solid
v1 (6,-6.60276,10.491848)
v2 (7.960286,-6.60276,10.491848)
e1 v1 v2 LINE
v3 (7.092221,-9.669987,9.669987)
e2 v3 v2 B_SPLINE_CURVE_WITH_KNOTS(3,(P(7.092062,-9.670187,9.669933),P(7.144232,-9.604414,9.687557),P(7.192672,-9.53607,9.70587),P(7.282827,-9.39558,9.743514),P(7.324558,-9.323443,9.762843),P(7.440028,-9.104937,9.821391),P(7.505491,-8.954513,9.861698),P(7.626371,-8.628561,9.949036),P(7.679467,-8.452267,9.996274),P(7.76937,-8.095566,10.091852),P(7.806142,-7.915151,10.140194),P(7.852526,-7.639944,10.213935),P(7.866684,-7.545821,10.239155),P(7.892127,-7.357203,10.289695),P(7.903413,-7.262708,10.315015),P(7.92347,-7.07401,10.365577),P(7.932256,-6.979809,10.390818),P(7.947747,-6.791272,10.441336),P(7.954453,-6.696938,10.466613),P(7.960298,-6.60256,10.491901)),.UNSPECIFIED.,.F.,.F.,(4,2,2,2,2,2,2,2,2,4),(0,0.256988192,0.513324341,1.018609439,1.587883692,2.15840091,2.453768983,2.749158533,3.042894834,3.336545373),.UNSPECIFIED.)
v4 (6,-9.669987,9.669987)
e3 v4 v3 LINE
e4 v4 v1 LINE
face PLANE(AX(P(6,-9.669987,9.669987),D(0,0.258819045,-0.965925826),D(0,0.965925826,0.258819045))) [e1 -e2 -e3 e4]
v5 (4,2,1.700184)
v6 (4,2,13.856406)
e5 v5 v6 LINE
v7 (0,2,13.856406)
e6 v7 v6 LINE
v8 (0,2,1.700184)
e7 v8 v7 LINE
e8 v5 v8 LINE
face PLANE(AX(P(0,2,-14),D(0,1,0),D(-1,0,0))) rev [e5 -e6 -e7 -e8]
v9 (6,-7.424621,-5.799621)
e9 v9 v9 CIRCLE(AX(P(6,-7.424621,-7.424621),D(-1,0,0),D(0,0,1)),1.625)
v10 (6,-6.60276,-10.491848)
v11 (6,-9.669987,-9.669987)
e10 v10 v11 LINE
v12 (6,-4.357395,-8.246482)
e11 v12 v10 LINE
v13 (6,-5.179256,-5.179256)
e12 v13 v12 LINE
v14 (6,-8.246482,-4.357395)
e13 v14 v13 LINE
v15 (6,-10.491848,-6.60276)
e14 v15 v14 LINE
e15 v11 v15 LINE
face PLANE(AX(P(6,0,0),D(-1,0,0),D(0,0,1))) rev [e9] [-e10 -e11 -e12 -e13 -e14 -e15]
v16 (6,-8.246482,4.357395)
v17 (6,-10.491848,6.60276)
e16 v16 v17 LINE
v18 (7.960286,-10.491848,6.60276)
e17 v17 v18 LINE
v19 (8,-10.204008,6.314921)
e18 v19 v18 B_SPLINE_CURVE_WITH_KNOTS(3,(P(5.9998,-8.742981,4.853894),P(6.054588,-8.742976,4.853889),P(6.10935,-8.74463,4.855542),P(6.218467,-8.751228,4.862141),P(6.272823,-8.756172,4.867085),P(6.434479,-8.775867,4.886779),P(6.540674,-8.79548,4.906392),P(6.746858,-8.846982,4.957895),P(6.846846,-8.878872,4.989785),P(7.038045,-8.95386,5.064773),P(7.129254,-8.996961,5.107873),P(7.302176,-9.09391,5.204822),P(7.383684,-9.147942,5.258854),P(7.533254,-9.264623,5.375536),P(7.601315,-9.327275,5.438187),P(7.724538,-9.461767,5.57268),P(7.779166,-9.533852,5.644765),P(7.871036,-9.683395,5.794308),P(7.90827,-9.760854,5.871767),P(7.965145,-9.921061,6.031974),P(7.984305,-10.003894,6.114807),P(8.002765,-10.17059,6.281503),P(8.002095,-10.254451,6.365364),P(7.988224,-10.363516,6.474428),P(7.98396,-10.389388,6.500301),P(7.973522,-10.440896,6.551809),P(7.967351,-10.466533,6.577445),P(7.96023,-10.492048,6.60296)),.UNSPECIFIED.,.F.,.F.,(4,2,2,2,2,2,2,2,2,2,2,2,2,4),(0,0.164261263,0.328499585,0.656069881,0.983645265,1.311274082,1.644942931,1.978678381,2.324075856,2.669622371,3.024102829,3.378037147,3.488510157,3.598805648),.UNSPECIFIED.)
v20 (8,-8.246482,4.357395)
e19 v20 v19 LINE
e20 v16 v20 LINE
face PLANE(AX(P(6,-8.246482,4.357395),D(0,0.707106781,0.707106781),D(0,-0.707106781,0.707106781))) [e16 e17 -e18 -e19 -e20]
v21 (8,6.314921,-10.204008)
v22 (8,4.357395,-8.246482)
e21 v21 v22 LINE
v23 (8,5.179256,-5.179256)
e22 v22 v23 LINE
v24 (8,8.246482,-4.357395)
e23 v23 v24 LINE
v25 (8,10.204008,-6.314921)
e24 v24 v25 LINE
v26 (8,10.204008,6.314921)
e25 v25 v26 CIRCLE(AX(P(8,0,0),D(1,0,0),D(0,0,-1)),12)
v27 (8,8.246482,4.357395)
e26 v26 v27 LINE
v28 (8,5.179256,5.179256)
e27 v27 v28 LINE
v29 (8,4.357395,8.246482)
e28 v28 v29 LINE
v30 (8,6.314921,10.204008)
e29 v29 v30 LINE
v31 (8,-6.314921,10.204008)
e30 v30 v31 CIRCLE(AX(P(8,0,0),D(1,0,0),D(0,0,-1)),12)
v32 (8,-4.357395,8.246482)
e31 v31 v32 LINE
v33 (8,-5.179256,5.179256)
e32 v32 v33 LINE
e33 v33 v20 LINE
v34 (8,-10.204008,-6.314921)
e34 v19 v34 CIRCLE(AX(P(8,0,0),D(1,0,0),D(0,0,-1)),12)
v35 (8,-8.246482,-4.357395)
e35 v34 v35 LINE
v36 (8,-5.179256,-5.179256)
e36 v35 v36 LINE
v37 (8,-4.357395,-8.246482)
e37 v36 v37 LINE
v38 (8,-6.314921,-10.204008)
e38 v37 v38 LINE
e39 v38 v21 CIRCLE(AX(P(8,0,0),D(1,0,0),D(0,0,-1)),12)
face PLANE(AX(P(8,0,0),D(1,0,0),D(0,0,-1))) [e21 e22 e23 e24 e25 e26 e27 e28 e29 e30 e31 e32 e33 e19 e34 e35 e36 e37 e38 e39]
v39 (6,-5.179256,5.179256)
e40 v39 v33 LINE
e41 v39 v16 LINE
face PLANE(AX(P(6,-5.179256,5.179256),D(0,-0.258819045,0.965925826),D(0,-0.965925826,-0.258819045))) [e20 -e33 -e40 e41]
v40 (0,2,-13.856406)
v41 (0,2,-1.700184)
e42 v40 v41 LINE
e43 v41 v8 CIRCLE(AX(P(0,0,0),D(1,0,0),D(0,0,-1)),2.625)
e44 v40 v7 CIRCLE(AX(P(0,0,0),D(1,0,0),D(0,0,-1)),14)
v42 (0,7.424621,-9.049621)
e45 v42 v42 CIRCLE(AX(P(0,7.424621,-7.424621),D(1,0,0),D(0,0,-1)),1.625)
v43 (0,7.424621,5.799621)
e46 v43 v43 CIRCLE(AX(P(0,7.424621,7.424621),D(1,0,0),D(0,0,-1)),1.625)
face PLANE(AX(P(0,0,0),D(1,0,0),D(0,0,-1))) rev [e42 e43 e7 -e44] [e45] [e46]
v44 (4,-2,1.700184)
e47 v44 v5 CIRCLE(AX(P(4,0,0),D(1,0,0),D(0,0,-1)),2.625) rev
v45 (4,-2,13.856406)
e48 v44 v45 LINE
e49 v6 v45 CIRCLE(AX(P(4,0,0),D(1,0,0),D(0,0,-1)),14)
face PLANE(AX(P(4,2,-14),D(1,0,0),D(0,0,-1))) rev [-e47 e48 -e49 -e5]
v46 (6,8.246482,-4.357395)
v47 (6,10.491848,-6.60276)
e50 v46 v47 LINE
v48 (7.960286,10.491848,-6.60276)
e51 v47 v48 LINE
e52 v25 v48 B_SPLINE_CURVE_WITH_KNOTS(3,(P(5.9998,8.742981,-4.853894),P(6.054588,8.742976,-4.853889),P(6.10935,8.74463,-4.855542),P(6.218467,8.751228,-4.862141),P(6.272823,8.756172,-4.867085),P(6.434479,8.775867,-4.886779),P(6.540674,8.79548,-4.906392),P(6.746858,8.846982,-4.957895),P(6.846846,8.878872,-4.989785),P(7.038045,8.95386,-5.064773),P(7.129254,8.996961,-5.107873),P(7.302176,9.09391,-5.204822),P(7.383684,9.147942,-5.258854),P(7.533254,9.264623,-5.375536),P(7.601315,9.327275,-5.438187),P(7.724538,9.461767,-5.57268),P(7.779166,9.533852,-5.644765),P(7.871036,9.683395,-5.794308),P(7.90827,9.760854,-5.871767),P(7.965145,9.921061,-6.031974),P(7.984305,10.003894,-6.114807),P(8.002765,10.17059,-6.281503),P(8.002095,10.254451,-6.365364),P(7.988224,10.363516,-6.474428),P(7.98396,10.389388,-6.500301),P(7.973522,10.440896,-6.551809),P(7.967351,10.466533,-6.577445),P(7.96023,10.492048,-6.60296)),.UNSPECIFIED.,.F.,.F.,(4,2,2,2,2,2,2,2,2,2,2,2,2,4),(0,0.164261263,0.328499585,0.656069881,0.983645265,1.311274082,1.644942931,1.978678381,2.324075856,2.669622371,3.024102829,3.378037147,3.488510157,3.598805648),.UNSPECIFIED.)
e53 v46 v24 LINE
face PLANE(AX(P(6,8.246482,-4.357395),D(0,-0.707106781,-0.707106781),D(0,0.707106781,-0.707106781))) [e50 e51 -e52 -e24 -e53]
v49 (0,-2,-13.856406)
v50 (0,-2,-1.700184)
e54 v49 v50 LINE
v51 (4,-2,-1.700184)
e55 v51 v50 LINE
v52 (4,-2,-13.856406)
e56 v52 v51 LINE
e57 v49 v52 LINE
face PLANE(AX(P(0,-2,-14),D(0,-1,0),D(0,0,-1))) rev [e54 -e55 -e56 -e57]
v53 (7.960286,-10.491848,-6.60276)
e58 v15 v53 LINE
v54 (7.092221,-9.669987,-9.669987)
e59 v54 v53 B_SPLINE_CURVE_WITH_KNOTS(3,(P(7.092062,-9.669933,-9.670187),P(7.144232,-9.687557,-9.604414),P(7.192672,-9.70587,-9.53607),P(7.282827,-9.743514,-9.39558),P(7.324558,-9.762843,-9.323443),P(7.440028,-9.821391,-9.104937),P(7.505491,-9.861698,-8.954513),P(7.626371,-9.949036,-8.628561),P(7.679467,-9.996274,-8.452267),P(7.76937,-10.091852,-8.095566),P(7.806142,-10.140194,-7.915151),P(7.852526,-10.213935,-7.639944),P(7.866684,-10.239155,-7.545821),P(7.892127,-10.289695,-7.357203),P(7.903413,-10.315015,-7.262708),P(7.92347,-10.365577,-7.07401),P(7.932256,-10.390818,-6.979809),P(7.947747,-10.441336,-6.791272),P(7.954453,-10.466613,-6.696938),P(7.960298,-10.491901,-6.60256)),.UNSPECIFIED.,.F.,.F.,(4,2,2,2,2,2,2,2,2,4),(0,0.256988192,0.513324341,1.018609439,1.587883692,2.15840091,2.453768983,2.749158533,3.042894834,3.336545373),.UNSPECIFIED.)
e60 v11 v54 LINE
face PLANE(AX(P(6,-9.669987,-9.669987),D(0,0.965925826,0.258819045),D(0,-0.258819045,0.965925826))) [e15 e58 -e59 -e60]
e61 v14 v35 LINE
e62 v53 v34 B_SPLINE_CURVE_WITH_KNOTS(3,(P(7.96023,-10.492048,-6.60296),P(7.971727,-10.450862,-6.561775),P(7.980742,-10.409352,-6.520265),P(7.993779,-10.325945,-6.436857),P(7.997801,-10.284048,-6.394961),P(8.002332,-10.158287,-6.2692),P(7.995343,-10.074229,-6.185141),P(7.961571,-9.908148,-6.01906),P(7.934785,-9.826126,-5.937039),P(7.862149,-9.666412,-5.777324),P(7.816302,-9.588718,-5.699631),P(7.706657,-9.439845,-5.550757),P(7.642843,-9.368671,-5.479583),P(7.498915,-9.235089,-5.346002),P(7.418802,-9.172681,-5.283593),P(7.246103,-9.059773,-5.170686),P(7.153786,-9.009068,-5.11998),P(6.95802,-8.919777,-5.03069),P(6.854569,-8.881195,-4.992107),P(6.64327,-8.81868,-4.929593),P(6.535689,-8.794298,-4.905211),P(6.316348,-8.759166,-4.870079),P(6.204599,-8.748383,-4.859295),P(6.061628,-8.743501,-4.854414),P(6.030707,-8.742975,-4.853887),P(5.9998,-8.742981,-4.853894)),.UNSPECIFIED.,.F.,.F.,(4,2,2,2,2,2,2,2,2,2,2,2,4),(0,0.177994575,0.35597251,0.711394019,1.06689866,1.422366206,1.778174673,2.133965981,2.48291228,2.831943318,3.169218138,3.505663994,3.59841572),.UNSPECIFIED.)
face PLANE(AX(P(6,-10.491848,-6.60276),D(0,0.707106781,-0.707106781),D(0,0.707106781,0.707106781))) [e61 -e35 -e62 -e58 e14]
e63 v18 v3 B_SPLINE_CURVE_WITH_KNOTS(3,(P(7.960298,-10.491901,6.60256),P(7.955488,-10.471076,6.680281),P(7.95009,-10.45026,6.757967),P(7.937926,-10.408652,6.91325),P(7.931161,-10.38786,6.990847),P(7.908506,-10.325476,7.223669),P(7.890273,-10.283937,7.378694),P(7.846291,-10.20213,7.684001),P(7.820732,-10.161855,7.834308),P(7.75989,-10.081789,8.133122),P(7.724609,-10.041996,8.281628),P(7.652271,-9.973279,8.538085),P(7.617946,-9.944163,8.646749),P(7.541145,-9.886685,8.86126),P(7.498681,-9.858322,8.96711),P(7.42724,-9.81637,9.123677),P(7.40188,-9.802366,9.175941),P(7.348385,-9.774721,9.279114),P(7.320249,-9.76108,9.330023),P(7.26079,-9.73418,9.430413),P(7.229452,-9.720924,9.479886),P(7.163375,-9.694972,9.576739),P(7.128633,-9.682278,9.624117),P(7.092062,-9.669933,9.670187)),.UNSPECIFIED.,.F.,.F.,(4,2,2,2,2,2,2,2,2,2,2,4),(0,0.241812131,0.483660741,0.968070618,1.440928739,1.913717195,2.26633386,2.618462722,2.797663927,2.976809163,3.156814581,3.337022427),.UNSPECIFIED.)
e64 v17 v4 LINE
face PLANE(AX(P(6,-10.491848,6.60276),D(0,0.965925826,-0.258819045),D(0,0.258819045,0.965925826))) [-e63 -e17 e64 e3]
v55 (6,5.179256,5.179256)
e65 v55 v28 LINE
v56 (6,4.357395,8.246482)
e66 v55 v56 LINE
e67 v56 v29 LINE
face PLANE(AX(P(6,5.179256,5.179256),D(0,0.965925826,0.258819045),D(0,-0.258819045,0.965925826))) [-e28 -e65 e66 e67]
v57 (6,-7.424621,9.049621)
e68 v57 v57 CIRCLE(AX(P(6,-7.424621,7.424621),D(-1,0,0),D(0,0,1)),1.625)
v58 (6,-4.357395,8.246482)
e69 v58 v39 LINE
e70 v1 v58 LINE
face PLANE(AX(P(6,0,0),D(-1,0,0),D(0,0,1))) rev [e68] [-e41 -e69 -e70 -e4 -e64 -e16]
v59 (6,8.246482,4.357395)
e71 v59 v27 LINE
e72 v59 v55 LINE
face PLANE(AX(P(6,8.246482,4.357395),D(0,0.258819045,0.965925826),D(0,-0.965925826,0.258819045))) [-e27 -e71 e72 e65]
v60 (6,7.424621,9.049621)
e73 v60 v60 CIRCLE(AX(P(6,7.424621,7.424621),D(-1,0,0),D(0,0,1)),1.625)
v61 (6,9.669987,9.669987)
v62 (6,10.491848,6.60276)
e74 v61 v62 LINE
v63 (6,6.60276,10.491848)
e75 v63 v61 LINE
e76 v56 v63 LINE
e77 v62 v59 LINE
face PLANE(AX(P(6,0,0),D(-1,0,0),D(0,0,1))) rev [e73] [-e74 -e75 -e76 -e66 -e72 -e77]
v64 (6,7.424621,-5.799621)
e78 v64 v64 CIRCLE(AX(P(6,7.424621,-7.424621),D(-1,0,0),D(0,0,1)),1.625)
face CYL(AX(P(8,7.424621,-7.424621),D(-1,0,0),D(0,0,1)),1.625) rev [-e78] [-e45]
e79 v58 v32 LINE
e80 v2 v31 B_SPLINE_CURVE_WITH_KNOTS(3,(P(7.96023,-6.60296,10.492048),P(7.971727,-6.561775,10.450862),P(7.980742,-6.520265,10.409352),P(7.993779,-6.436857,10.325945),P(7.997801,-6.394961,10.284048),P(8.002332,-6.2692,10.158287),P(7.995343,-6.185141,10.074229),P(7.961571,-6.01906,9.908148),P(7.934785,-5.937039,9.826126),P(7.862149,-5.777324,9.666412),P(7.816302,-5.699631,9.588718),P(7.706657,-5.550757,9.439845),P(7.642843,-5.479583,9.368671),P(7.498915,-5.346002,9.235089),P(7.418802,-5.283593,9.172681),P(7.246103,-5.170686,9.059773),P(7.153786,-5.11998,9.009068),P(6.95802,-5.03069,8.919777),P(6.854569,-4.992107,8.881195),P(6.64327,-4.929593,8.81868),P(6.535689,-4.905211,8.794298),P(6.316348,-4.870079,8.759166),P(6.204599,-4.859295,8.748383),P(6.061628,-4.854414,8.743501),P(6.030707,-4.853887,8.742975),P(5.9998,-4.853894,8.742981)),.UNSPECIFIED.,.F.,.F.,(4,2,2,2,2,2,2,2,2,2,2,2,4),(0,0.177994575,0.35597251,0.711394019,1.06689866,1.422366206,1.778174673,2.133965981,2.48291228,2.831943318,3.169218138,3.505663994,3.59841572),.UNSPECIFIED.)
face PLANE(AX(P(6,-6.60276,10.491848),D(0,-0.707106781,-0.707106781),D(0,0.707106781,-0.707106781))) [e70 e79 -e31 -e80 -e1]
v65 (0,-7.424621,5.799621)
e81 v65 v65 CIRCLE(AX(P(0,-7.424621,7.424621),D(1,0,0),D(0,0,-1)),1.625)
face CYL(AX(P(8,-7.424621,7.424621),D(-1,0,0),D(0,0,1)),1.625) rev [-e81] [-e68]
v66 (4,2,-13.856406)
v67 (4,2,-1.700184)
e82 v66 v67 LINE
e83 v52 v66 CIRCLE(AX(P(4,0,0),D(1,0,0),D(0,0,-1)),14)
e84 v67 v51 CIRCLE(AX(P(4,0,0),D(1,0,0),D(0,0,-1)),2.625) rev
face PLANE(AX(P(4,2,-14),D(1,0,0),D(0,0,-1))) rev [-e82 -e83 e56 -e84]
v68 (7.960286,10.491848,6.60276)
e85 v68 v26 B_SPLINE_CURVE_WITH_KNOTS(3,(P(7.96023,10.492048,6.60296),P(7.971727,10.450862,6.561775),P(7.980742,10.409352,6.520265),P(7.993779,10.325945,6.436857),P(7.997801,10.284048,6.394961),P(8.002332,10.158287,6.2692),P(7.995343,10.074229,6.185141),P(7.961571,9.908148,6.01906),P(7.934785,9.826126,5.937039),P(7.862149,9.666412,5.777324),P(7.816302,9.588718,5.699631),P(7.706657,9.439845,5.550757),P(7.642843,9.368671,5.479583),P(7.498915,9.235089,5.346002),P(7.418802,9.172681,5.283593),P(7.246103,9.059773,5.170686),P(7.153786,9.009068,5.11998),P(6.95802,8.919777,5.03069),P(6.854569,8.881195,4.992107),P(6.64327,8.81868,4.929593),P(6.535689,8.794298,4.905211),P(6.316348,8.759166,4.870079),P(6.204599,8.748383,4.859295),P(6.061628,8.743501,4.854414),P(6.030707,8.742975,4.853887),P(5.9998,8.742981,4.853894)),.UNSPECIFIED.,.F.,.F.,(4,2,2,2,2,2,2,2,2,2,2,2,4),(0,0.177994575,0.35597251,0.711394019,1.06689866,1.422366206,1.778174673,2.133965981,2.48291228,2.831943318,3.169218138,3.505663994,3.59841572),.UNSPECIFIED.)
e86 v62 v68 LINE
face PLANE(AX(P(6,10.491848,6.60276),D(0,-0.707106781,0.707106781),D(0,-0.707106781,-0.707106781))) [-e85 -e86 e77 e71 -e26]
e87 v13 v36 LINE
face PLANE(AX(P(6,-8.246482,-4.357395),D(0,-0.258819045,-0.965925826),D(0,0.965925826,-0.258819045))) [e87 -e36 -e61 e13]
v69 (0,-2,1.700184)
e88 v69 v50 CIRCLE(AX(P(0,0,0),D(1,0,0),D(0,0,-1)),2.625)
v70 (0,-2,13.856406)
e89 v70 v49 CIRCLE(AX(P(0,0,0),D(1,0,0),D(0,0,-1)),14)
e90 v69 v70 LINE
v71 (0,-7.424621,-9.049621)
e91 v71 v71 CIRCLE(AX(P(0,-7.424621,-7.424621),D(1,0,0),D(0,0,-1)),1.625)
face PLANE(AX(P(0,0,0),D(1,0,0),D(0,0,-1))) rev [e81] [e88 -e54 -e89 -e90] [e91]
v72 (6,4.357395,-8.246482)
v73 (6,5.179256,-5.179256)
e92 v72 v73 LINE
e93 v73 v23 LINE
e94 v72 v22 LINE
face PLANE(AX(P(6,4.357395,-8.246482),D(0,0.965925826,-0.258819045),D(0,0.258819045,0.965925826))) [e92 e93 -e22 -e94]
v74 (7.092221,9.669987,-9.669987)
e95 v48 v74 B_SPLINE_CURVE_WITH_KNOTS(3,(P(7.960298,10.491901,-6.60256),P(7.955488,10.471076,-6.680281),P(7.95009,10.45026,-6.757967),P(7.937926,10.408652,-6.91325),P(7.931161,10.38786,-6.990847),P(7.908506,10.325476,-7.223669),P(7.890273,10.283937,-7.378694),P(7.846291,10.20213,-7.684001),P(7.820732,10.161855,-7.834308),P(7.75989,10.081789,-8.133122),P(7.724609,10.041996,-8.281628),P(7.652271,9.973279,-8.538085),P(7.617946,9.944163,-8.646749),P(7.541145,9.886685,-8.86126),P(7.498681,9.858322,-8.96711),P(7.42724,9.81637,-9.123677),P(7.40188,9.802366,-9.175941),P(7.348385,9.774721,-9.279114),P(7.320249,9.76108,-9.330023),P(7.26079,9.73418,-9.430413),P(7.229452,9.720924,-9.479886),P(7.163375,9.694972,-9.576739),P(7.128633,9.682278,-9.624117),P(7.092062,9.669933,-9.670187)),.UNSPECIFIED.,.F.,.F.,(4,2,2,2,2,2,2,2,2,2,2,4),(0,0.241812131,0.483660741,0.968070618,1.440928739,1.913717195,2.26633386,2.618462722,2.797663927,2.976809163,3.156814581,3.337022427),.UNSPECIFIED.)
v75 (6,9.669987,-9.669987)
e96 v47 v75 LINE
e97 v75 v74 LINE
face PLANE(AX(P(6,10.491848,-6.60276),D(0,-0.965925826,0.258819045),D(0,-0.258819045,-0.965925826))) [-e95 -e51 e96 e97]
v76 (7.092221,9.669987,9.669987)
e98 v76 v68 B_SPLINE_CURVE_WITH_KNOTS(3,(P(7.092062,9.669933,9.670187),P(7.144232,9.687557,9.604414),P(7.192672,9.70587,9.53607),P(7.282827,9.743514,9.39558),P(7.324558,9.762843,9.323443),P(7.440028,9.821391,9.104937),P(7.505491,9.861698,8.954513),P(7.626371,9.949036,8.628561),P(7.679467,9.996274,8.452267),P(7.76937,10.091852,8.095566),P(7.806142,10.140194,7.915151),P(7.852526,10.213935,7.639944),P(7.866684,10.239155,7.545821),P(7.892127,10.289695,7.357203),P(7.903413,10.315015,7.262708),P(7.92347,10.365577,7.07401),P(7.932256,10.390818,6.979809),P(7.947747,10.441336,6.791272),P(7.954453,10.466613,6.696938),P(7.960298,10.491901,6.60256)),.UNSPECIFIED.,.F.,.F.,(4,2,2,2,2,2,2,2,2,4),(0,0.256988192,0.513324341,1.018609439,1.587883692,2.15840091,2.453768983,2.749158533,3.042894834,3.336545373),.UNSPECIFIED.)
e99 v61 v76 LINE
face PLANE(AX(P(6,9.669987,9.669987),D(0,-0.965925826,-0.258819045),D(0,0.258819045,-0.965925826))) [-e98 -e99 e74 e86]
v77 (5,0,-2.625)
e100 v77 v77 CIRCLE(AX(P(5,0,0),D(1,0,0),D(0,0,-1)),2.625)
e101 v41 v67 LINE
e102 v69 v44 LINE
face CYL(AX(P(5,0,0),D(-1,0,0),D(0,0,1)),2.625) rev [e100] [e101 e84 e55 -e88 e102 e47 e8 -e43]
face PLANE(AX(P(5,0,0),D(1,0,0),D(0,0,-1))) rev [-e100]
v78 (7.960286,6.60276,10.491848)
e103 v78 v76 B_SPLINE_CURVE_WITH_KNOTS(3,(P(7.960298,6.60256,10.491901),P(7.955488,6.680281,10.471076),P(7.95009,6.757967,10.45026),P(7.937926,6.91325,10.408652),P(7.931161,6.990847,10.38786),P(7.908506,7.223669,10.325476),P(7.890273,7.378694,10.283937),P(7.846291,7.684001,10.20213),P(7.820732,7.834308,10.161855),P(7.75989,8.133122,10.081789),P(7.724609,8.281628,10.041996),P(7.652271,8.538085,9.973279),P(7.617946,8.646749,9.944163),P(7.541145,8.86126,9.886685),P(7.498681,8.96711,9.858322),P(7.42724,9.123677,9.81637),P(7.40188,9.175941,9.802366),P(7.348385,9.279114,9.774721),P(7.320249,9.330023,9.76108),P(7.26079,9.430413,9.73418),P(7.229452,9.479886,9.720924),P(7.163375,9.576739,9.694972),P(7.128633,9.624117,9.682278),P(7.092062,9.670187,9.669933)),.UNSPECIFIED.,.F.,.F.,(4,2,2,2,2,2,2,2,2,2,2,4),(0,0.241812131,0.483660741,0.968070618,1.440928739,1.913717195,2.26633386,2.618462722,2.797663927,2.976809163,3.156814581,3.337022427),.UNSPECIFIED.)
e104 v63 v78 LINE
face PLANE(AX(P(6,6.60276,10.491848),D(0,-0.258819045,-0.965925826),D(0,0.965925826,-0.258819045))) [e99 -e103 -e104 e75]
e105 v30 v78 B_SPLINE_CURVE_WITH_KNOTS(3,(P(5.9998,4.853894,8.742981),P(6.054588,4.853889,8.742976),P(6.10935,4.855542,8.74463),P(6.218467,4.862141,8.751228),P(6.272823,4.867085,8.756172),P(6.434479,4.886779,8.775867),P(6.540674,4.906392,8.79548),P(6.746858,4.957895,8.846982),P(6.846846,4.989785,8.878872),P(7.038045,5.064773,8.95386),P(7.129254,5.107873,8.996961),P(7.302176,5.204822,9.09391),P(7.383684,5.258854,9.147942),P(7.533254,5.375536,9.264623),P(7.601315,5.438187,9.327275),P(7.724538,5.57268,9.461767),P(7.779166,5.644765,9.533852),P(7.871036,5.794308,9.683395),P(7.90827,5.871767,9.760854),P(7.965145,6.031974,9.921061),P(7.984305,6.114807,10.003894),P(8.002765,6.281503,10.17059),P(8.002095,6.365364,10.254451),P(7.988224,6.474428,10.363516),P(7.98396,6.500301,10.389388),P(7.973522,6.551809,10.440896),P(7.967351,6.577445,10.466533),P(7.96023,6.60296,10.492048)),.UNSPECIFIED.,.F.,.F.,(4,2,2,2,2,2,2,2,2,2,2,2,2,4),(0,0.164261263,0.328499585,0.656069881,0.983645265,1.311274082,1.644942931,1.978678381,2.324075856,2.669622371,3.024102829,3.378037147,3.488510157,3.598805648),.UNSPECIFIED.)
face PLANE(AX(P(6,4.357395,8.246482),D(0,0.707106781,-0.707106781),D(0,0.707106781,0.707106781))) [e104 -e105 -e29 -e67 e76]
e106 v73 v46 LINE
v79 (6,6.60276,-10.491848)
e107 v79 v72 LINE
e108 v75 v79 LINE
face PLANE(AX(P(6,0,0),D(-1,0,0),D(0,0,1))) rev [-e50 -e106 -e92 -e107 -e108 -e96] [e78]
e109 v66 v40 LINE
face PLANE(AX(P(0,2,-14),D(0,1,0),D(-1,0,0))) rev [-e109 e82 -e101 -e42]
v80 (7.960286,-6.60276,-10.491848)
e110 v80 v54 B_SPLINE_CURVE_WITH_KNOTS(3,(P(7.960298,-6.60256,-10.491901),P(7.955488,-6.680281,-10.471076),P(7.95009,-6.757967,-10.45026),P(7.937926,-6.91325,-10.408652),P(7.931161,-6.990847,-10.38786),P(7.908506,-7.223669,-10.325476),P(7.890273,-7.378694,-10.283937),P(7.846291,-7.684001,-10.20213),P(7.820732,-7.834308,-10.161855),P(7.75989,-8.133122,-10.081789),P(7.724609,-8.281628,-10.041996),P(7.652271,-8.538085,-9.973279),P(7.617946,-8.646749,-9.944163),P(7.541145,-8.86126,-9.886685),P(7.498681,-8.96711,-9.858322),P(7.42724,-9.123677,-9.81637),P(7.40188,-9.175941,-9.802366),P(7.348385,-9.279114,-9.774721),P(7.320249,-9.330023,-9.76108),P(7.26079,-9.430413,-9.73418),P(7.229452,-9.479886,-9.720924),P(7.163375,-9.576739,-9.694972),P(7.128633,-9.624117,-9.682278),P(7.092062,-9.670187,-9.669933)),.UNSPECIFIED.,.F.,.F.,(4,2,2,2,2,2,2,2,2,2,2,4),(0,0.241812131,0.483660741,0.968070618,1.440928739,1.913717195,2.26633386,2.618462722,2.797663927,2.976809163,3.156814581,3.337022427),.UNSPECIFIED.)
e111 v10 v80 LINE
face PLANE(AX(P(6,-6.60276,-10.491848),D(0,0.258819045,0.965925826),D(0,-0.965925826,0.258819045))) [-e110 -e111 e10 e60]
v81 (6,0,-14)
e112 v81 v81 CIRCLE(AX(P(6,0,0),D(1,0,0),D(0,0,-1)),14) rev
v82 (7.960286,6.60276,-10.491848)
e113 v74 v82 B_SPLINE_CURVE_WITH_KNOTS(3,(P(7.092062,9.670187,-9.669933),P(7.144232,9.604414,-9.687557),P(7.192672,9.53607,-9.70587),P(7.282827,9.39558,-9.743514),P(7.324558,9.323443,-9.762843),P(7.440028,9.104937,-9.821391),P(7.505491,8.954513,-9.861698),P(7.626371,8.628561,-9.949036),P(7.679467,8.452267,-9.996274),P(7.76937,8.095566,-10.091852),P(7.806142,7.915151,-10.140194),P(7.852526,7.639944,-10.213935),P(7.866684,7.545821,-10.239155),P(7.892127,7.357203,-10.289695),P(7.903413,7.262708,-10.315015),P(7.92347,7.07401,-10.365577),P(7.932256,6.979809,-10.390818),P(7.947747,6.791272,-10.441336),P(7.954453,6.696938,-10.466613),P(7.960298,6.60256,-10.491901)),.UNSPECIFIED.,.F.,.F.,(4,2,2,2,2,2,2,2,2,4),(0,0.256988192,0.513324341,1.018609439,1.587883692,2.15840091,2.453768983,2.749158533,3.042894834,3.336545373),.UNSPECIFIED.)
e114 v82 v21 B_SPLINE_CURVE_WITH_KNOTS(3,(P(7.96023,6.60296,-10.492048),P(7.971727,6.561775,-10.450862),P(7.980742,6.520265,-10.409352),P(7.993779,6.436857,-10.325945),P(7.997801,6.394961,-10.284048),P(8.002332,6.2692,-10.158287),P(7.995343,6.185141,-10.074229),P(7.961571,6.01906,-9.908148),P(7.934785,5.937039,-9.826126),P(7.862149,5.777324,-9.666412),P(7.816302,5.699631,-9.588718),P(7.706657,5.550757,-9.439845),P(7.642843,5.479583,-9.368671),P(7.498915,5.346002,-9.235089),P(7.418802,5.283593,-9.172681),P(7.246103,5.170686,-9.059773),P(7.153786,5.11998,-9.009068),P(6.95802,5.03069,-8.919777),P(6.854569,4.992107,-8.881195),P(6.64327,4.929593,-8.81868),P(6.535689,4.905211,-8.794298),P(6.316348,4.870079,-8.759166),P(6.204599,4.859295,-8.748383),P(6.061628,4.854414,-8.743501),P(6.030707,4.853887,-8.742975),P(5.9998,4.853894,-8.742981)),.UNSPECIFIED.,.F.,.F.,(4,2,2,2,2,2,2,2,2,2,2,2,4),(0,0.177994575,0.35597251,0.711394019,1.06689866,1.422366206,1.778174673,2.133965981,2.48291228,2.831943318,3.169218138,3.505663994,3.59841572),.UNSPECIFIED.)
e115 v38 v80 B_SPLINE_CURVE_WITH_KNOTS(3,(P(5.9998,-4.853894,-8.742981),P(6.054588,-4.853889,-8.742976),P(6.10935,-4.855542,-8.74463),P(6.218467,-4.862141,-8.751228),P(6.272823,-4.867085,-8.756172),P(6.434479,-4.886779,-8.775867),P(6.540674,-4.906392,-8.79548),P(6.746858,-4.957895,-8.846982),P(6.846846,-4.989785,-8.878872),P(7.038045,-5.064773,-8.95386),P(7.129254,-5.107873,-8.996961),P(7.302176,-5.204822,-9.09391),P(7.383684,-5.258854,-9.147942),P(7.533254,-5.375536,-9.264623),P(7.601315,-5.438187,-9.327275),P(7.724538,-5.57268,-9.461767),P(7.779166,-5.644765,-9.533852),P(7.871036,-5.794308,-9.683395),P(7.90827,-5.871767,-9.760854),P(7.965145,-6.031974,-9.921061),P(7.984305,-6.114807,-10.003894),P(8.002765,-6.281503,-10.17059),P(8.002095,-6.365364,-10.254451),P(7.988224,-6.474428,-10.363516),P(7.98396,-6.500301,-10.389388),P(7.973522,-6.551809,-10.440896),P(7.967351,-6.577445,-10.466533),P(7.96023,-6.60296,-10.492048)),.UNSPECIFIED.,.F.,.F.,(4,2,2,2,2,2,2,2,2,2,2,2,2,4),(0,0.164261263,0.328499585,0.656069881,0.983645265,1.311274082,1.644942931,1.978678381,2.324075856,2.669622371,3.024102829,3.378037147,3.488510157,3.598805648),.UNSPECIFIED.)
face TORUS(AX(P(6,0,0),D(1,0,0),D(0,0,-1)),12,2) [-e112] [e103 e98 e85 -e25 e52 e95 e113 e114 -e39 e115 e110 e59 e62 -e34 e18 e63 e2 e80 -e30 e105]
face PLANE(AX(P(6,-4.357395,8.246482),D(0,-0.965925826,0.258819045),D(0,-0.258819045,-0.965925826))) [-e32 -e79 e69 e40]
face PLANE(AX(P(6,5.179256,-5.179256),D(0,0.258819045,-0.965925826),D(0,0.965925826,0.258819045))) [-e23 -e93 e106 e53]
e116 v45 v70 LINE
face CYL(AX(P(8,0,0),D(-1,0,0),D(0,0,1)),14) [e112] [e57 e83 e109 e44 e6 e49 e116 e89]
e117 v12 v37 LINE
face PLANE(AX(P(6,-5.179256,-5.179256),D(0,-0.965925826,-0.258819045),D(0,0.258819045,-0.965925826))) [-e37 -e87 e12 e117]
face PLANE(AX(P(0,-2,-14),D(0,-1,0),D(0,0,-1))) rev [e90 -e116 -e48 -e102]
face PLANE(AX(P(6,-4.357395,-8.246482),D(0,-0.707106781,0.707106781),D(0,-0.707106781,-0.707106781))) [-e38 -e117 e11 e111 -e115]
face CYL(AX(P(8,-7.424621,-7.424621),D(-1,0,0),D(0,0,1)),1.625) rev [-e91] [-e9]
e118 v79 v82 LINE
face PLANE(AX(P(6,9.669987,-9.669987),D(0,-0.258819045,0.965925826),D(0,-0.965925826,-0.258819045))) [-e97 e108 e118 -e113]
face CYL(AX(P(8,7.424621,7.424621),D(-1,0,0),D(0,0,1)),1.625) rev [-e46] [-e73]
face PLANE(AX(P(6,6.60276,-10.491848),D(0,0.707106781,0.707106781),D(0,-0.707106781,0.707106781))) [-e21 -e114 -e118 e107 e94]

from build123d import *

# Parameters (mm, degrees)
SKETCH4_R               = 14
SKETCH4_R_2             = 1.625
CIRCULAR_FOOT_DEPTH     = 8
FILLET1_R               = 2
CUT_EXTRUDE1_DEPTH      = 2
CUT_EXTRUDE2_DEPTH      = 22.354156673
CUT_EXTRUDE2_DEPTH_BACK = 22.354156673
SKETCH14_W              = 4
SKETCH14_H              = 4
SKETCH16_R              = 2.625
CUT_EXTRUDE3_DEPTH      = 5


with BuildPart() as part:
    # Sketch4 → Circular Foot (new body)
    with BuildSketch(Plane(origin=(0, 0, 0), x_dir=(0, 0, -1), z_dir=(1, 0, 0))):
        Circle(SKETCH4_R)
        with Locations((-7.424621202, -7.424621202)):
            Circle(SKETCH4_R_2, mode=Mode.SUBTRACT)
        with Locations((7.424621202, -7.424621202)):
            Circle(SKETCH4_R_2, mode=Mode.SUBTRACT)
        with Locations((7.424621202, 7.424621202)):
            Circle(SKETCH4_R_2, mode=Mode.SUBTRACT)
        with Locations((-7.424621202, 7.424621202)):
            Circle(SKETCH4_R_2, mode=Mode.SUBTRACT)
    extrude(amount=CIRCULAR_FOOT_DEPTH)

    # Fillet1
    # the kernel refuses this fillet: 2 mm, written as the material it takes off along each edge
    with BuildSketch(Plane(origin=(8, 0, 0), x_dir=(0, 0, -1), z_dir=(0, -1, 0))) as fillet1_piece_1:
        with BuildLine():
            CenterArc((14 - FILLET1_R, -FILLET1_R), FILLET1_R, 0, 90)
            Line((14 - FILLET1_R, 0), (14, 0))
            Line((14, 0), (14, -FILLET1_R))
        make_face()
    revolve(axis=Axis((8, 0, 0), (1, 0, 0)), mode=Mode.SUBTRACT)

    # Sketch7 → Cut-Extrude1 (cut)
    with BuildSketch(Plane.ZY.offset(-8)):
        Polygon((-5.179255605, -5.179255605), (-8.246482052, -4.357394755), (-10.491847649, -6.602760353), (-9.6699868, -9.6699868), (-6.602760353, -10.491847649), (-4.357394755, -8.246482052), align=None)
        Polygon((6.602760353, -10.491847649), (9.6699868, -9.6699868), (10.491847649, -6.602760353), (8.246482052, -4.357394755), (5.179255605, -5.179255605), (4.357394755, -8.246482052), align=None)
        Polygon((6.602760353, 10.491847649), (4.357394755, 8.246482052), (5.179255605, 5.179255605), (8.246482052, 4.357394755), (10.491847649, 6.602760353), (9.6699868, 9.6699868), align=None)
        Polygon((-4.357394755, 8.246482052), (-6.602760353, 10.491847649), (-9.6699868, 9.6699868), (-10.491847649, 6.602760353), (-8.246482052, 4.357394755), (-5.179255605, 5.179255605), align=None)
    extrude(amount=CUT_EXTRUDE1_DEPTH, mode=Mode.SUBTRACT)

    # Sketch14 → Cut-Extrude2 (cut, two sides: drawn at the far end of the back side and taken through both)
    with BuildSketch(Plane.XY.offset(-CUT_EXTRUDE2_DEPTH_BACK)):
        with Locations((2, 0)):
            Rectangle(SKETCH14_W, SKETCH14_H)
    extrude(amount=CUT_EXTRUDE2_DEPTH + CUT_EXTRUDE2_DEPTH_BACK, mode=Mode.SUBTRACT)

    # Sketch16 → Cut-Extrude3 (cut)
    with BuildSketch(Plane(origin=(0, 0, 0), x_dir=(0, 0, -1), z_dir=(1, 0, 0))):
        with Locations(Location((0, 0, 0), (0, 0, 229.632406456))):
            Circle(SKETCH16_R)
    extrude(amount=CUT_EXTRUDE3_DEPTH, mode=Mode.SUBTRACT)


solid = part.part
